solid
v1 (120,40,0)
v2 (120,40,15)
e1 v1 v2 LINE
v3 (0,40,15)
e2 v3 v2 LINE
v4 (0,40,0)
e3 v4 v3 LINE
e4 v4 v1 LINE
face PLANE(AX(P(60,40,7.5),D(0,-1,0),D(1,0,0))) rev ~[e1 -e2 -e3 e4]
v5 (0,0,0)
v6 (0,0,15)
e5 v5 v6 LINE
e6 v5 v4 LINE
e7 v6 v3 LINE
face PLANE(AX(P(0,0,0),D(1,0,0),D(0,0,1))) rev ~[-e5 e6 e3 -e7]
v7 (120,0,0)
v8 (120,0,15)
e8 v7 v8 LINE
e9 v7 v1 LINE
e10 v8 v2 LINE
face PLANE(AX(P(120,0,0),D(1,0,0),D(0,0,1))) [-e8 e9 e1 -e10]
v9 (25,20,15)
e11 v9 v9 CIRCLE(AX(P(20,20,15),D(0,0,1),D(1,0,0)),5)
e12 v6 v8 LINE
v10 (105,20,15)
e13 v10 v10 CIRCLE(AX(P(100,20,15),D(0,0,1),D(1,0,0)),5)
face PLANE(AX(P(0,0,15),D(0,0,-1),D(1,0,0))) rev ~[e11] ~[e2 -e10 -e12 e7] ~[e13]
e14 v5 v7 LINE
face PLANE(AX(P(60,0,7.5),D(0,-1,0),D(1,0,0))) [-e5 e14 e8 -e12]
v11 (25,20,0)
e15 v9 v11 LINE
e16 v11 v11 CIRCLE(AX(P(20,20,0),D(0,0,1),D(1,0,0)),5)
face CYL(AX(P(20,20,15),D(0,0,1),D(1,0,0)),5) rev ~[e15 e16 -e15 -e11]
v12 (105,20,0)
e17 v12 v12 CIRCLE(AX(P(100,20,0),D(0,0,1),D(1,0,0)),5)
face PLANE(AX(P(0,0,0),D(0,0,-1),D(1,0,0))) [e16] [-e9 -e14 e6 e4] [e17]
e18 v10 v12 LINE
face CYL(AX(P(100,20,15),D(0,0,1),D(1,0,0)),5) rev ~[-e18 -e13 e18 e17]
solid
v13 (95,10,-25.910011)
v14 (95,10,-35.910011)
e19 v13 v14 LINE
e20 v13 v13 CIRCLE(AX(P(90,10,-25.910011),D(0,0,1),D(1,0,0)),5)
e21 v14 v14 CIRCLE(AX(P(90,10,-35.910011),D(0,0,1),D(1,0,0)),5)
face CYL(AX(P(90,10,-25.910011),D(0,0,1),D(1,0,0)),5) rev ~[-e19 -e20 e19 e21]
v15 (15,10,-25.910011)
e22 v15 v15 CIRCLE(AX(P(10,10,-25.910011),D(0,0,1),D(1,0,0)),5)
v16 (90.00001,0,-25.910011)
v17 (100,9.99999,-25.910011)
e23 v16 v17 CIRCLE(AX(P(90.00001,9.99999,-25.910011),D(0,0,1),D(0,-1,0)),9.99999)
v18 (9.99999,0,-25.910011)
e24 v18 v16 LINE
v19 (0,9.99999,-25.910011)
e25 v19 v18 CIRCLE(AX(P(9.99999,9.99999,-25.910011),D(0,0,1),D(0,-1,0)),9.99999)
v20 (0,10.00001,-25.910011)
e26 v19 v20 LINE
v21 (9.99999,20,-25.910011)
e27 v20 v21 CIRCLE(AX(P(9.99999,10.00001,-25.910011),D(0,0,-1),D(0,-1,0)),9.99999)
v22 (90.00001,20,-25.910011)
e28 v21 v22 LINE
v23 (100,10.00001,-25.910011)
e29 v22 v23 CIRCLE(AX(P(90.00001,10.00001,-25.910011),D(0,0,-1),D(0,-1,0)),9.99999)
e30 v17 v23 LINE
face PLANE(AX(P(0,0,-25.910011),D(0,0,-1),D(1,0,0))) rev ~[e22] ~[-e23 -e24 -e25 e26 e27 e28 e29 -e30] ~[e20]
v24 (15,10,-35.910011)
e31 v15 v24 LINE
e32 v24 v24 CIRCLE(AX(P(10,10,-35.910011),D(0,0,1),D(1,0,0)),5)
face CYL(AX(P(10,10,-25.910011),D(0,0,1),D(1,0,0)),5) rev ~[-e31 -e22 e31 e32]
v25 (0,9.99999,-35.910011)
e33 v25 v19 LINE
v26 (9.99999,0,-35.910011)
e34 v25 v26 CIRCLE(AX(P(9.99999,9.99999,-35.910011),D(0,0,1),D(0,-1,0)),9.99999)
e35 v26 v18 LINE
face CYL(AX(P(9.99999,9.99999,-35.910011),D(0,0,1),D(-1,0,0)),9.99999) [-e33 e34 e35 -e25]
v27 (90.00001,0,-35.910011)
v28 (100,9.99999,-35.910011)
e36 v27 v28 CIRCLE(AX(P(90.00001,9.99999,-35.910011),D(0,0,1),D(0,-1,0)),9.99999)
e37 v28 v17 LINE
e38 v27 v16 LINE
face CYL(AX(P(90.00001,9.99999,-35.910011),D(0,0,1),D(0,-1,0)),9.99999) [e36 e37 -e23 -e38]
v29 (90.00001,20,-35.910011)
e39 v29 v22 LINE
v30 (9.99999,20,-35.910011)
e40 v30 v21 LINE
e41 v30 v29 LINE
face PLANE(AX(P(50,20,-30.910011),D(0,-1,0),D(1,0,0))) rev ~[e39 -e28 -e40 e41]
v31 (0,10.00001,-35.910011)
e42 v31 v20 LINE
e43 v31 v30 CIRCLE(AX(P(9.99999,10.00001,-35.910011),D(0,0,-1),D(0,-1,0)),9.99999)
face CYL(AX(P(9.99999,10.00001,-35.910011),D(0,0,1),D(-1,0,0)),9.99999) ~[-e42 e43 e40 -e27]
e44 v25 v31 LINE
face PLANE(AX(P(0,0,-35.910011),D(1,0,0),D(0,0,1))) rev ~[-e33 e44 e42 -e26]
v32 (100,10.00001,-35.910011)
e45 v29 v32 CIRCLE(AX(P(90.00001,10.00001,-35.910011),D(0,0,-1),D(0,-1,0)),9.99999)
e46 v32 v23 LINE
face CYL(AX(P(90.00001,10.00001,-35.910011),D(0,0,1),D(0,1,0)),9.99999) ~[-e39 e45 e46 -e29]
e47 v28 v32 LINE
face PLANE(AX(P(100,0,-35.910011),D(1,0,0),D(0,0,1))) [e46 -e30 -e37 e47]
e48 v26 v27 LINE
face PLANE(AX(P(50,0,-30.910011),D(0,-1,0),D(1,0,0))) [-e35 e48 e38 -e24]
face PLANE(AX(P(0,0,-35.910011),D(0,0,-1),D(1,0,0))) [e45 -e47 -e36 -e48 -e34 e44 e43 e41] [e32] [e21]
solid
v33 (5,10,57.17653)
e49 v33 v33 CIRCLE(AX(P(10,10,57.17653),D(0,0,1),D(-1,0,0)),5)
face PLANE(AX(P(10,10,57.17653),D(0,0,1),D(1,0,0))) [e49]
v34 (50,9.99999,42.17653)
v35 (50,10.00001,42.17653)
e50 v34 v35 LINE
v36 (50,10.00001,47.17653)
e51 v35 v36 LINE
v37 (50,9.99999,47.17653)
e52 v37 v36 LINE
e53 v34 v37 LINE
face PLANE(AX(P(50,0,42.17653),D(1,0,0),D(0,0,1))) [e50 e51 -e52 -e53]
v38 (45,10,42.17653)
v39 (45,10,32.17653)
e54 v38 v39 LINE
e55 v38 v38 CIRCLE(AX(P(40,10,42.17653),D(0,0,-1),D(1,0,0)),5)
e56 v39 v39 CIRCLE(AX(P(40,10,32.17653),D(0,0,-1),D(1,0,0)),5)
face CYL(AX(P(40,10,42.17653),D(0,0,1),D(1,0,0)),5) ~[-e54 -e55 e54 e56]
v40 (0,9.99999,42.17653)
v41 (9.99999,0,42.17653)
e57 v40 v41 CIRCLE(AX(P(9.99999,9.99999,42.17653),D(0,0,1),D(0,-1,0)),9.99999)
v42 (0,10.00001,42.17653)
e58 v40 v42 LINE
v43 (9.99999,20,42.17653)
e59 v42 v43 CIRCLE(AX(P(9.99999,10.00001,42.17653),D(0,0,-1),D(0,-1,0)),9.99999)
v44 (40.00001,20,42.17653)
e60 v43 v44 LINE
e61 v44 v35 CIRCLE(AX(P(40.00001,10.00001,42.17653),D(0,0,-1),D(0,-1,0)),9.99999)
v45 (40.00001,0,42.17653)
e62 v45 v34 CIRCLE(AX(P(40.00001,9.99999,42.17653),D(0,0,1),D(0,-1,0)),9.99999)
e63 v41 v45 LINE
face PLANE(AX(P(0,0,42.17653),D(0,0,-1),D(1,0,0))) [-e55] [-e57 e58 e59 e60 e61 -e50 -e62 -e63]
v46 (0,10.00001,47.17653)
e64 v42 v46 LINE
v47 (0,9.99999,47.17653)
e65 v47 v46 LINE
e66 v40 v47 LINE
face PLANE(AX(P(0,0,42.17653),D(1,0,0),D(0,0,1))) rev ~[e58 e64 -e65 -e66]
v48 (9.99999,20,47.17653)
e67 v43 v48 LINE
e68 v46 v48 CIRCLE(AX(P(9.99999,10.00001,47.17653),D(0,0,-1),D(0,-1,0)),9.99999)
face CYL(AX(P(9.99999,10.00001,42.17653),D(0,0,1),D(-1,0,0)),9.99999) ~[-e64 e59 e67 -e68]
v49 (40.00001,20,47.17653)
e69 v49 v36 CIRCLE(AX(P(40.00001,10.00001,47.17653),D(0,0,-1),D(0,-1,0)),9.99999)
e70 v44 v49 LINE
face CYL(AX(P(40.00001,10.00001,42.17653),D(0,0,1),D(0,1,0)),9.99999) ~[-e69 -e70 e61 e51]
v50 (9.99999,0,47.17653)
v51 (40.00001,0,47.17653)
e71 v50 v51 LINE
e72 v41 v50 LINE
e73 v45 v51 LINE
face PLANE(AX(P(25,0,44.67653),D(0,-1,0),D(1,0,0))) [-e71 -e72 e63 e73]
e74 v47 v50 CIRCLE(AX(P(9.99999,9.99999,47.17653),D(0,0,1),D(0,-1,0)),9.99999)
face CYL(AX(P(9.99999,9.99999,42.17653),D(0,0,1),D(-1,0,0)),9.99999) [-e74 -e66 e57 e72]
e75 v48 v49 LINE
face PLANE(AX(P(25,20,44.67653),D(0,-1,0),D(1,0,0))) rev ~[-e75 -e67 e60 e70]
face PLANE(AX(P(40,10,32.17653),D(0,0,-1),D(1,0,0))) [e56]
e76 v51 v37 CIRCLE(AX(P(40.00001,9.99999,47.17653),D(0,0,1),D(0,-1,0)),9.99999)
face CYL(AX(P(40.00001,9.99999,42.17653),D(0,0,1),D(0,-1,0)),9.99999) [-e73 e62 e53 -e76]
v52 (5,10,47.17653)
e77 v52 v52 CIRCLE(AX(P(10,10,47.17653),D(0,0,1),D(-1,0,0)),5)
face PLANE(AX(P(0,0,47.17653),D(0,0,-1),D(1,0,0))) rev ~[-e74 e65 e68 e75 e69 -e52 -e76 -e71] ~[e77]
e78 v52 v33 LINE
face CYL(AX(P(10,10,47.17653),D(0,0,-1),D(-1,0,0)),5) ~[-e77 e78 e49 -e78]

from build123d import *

# Parameters (mm, degrees)
F0_W      = 120
F0_H      = 15
F1_DEPTH  = 40
F2_R      = 5
F3_DEPTH  = 37.52124
F4_W      = 50
F4_H      = 5
F5_DEPTH  = 20
F8_DEPTH  = 10
F7_R      = 5
F9_DEPTH  = 10
F10_R     = 9.99999
F11_W     = 100
F11_H     = 10
F12_DEPTH = 20
F13_R     = 5
F14_DEPTH = 25
F15_R     = 9.99999


# Not quite as in the source:
# - a fillet or chamfer is up to 0.001 mm smaller than in the source, because OpenCascade refuses the exact size


with BuildPart() as f1:
    # F0 (on Front) → F1 (new body)
    with BuildSketch(Plane.XZ):
        with Locations((60, 7.5)):
            Rectangle(F0_W, F0_H)
    extrude(amount=-F1_DEPTH)

    # F2 (on face) → F3 (cut)
    with BuildSketch(Plane.XY.offset(15)):
        with Locations((20, 20)):
            Circle(F2_R)
        with Locations((100, 20)):
            Circle(F2_R)
    extrude(amount=-F3_DEPTH, mode=Mode.SUBTRACT)


with BuildPart() as f5:
    # F4 (on Front) → F5 (new body)
    with BuildSketch(Plane.XZ):
        with Locations((25, 44.6765302146)):
            Rectangle(F4_W, F4_H)
    extrude(amount=-F5_DEPTH)

    # F6 (on face) → F8 (join)
    with BuildSketch(Plane.XY.offset(47.1765302146)):
        with BuildLine():
            ThreePointArc((15, 10), (10, 15), (5, 10))
            ThreePointArc((5, 10), (10, 5), (15, 10))
        make_face()
    extrude(amount=F8_DEPTH)

    # F7 (on face) → F9 (join)
    with BuildSketch(Plane(origin=(0, 0, 42.1765302146), x_dir=(1, 0, 0), z_dir=(0, 0, -1))):
        with Locations((40, -10)):
            Circle(F7_R)
    extrude(amount=F9_DEPTH)

    # F10 (radius 10 in the source; OpenCascade refuses exactly that, so slightly less here)
    f10_edges = [f5.edges().sort_by_distance(p)[0] for p in [
        (0, 20, 44.67653),
        (0, 0, 44.67653),
        (50, 0, 44.67653),
        (50, 20, 44.67653),
    ]]
    fillet(f10_edges, radius=F10_R)


with BuildPart() as f12:
    # F11 (on Front) → F12 (new body)
    with BuildSketch(Plane.XZ):
        with Locations((50, -30.9100110515)):
            Rectangle(F11_W, F11_H)
    extrude(amount=-F12_DEPTH)

    # F13 (on face) → F14 (cut)
    with BuildSketch(Plane.XY.offset(-25.9100110515)):
        with BuildLine():
            ThreePointArc((5, 10), (10, 5), (15, 10))
            ThreePointArc((15, 10), (10, 15), (5, 10))
        make_face()
        with Locations((90, 10)):
            Circle(F13_R)
    extrude(amount=-F14_DEPTH, mode=Mode.SUBTRACT)

    # F15 (radius 10 in the source; OpenCascade refuses exactly that, so slightly less here)
    f15_edges = [f12.edges().sort_by_distance(p)[0] for p in [
        (0, 0, -30.910011),
        (0, 20, -30.910011),
        (100, 20, -30.910011),
        (100, 0, -30.910011),
    ]]
    fillet(f15_edges, radius=F15_R)


solid = Compound([f1.part, f5.part, f12.part])
